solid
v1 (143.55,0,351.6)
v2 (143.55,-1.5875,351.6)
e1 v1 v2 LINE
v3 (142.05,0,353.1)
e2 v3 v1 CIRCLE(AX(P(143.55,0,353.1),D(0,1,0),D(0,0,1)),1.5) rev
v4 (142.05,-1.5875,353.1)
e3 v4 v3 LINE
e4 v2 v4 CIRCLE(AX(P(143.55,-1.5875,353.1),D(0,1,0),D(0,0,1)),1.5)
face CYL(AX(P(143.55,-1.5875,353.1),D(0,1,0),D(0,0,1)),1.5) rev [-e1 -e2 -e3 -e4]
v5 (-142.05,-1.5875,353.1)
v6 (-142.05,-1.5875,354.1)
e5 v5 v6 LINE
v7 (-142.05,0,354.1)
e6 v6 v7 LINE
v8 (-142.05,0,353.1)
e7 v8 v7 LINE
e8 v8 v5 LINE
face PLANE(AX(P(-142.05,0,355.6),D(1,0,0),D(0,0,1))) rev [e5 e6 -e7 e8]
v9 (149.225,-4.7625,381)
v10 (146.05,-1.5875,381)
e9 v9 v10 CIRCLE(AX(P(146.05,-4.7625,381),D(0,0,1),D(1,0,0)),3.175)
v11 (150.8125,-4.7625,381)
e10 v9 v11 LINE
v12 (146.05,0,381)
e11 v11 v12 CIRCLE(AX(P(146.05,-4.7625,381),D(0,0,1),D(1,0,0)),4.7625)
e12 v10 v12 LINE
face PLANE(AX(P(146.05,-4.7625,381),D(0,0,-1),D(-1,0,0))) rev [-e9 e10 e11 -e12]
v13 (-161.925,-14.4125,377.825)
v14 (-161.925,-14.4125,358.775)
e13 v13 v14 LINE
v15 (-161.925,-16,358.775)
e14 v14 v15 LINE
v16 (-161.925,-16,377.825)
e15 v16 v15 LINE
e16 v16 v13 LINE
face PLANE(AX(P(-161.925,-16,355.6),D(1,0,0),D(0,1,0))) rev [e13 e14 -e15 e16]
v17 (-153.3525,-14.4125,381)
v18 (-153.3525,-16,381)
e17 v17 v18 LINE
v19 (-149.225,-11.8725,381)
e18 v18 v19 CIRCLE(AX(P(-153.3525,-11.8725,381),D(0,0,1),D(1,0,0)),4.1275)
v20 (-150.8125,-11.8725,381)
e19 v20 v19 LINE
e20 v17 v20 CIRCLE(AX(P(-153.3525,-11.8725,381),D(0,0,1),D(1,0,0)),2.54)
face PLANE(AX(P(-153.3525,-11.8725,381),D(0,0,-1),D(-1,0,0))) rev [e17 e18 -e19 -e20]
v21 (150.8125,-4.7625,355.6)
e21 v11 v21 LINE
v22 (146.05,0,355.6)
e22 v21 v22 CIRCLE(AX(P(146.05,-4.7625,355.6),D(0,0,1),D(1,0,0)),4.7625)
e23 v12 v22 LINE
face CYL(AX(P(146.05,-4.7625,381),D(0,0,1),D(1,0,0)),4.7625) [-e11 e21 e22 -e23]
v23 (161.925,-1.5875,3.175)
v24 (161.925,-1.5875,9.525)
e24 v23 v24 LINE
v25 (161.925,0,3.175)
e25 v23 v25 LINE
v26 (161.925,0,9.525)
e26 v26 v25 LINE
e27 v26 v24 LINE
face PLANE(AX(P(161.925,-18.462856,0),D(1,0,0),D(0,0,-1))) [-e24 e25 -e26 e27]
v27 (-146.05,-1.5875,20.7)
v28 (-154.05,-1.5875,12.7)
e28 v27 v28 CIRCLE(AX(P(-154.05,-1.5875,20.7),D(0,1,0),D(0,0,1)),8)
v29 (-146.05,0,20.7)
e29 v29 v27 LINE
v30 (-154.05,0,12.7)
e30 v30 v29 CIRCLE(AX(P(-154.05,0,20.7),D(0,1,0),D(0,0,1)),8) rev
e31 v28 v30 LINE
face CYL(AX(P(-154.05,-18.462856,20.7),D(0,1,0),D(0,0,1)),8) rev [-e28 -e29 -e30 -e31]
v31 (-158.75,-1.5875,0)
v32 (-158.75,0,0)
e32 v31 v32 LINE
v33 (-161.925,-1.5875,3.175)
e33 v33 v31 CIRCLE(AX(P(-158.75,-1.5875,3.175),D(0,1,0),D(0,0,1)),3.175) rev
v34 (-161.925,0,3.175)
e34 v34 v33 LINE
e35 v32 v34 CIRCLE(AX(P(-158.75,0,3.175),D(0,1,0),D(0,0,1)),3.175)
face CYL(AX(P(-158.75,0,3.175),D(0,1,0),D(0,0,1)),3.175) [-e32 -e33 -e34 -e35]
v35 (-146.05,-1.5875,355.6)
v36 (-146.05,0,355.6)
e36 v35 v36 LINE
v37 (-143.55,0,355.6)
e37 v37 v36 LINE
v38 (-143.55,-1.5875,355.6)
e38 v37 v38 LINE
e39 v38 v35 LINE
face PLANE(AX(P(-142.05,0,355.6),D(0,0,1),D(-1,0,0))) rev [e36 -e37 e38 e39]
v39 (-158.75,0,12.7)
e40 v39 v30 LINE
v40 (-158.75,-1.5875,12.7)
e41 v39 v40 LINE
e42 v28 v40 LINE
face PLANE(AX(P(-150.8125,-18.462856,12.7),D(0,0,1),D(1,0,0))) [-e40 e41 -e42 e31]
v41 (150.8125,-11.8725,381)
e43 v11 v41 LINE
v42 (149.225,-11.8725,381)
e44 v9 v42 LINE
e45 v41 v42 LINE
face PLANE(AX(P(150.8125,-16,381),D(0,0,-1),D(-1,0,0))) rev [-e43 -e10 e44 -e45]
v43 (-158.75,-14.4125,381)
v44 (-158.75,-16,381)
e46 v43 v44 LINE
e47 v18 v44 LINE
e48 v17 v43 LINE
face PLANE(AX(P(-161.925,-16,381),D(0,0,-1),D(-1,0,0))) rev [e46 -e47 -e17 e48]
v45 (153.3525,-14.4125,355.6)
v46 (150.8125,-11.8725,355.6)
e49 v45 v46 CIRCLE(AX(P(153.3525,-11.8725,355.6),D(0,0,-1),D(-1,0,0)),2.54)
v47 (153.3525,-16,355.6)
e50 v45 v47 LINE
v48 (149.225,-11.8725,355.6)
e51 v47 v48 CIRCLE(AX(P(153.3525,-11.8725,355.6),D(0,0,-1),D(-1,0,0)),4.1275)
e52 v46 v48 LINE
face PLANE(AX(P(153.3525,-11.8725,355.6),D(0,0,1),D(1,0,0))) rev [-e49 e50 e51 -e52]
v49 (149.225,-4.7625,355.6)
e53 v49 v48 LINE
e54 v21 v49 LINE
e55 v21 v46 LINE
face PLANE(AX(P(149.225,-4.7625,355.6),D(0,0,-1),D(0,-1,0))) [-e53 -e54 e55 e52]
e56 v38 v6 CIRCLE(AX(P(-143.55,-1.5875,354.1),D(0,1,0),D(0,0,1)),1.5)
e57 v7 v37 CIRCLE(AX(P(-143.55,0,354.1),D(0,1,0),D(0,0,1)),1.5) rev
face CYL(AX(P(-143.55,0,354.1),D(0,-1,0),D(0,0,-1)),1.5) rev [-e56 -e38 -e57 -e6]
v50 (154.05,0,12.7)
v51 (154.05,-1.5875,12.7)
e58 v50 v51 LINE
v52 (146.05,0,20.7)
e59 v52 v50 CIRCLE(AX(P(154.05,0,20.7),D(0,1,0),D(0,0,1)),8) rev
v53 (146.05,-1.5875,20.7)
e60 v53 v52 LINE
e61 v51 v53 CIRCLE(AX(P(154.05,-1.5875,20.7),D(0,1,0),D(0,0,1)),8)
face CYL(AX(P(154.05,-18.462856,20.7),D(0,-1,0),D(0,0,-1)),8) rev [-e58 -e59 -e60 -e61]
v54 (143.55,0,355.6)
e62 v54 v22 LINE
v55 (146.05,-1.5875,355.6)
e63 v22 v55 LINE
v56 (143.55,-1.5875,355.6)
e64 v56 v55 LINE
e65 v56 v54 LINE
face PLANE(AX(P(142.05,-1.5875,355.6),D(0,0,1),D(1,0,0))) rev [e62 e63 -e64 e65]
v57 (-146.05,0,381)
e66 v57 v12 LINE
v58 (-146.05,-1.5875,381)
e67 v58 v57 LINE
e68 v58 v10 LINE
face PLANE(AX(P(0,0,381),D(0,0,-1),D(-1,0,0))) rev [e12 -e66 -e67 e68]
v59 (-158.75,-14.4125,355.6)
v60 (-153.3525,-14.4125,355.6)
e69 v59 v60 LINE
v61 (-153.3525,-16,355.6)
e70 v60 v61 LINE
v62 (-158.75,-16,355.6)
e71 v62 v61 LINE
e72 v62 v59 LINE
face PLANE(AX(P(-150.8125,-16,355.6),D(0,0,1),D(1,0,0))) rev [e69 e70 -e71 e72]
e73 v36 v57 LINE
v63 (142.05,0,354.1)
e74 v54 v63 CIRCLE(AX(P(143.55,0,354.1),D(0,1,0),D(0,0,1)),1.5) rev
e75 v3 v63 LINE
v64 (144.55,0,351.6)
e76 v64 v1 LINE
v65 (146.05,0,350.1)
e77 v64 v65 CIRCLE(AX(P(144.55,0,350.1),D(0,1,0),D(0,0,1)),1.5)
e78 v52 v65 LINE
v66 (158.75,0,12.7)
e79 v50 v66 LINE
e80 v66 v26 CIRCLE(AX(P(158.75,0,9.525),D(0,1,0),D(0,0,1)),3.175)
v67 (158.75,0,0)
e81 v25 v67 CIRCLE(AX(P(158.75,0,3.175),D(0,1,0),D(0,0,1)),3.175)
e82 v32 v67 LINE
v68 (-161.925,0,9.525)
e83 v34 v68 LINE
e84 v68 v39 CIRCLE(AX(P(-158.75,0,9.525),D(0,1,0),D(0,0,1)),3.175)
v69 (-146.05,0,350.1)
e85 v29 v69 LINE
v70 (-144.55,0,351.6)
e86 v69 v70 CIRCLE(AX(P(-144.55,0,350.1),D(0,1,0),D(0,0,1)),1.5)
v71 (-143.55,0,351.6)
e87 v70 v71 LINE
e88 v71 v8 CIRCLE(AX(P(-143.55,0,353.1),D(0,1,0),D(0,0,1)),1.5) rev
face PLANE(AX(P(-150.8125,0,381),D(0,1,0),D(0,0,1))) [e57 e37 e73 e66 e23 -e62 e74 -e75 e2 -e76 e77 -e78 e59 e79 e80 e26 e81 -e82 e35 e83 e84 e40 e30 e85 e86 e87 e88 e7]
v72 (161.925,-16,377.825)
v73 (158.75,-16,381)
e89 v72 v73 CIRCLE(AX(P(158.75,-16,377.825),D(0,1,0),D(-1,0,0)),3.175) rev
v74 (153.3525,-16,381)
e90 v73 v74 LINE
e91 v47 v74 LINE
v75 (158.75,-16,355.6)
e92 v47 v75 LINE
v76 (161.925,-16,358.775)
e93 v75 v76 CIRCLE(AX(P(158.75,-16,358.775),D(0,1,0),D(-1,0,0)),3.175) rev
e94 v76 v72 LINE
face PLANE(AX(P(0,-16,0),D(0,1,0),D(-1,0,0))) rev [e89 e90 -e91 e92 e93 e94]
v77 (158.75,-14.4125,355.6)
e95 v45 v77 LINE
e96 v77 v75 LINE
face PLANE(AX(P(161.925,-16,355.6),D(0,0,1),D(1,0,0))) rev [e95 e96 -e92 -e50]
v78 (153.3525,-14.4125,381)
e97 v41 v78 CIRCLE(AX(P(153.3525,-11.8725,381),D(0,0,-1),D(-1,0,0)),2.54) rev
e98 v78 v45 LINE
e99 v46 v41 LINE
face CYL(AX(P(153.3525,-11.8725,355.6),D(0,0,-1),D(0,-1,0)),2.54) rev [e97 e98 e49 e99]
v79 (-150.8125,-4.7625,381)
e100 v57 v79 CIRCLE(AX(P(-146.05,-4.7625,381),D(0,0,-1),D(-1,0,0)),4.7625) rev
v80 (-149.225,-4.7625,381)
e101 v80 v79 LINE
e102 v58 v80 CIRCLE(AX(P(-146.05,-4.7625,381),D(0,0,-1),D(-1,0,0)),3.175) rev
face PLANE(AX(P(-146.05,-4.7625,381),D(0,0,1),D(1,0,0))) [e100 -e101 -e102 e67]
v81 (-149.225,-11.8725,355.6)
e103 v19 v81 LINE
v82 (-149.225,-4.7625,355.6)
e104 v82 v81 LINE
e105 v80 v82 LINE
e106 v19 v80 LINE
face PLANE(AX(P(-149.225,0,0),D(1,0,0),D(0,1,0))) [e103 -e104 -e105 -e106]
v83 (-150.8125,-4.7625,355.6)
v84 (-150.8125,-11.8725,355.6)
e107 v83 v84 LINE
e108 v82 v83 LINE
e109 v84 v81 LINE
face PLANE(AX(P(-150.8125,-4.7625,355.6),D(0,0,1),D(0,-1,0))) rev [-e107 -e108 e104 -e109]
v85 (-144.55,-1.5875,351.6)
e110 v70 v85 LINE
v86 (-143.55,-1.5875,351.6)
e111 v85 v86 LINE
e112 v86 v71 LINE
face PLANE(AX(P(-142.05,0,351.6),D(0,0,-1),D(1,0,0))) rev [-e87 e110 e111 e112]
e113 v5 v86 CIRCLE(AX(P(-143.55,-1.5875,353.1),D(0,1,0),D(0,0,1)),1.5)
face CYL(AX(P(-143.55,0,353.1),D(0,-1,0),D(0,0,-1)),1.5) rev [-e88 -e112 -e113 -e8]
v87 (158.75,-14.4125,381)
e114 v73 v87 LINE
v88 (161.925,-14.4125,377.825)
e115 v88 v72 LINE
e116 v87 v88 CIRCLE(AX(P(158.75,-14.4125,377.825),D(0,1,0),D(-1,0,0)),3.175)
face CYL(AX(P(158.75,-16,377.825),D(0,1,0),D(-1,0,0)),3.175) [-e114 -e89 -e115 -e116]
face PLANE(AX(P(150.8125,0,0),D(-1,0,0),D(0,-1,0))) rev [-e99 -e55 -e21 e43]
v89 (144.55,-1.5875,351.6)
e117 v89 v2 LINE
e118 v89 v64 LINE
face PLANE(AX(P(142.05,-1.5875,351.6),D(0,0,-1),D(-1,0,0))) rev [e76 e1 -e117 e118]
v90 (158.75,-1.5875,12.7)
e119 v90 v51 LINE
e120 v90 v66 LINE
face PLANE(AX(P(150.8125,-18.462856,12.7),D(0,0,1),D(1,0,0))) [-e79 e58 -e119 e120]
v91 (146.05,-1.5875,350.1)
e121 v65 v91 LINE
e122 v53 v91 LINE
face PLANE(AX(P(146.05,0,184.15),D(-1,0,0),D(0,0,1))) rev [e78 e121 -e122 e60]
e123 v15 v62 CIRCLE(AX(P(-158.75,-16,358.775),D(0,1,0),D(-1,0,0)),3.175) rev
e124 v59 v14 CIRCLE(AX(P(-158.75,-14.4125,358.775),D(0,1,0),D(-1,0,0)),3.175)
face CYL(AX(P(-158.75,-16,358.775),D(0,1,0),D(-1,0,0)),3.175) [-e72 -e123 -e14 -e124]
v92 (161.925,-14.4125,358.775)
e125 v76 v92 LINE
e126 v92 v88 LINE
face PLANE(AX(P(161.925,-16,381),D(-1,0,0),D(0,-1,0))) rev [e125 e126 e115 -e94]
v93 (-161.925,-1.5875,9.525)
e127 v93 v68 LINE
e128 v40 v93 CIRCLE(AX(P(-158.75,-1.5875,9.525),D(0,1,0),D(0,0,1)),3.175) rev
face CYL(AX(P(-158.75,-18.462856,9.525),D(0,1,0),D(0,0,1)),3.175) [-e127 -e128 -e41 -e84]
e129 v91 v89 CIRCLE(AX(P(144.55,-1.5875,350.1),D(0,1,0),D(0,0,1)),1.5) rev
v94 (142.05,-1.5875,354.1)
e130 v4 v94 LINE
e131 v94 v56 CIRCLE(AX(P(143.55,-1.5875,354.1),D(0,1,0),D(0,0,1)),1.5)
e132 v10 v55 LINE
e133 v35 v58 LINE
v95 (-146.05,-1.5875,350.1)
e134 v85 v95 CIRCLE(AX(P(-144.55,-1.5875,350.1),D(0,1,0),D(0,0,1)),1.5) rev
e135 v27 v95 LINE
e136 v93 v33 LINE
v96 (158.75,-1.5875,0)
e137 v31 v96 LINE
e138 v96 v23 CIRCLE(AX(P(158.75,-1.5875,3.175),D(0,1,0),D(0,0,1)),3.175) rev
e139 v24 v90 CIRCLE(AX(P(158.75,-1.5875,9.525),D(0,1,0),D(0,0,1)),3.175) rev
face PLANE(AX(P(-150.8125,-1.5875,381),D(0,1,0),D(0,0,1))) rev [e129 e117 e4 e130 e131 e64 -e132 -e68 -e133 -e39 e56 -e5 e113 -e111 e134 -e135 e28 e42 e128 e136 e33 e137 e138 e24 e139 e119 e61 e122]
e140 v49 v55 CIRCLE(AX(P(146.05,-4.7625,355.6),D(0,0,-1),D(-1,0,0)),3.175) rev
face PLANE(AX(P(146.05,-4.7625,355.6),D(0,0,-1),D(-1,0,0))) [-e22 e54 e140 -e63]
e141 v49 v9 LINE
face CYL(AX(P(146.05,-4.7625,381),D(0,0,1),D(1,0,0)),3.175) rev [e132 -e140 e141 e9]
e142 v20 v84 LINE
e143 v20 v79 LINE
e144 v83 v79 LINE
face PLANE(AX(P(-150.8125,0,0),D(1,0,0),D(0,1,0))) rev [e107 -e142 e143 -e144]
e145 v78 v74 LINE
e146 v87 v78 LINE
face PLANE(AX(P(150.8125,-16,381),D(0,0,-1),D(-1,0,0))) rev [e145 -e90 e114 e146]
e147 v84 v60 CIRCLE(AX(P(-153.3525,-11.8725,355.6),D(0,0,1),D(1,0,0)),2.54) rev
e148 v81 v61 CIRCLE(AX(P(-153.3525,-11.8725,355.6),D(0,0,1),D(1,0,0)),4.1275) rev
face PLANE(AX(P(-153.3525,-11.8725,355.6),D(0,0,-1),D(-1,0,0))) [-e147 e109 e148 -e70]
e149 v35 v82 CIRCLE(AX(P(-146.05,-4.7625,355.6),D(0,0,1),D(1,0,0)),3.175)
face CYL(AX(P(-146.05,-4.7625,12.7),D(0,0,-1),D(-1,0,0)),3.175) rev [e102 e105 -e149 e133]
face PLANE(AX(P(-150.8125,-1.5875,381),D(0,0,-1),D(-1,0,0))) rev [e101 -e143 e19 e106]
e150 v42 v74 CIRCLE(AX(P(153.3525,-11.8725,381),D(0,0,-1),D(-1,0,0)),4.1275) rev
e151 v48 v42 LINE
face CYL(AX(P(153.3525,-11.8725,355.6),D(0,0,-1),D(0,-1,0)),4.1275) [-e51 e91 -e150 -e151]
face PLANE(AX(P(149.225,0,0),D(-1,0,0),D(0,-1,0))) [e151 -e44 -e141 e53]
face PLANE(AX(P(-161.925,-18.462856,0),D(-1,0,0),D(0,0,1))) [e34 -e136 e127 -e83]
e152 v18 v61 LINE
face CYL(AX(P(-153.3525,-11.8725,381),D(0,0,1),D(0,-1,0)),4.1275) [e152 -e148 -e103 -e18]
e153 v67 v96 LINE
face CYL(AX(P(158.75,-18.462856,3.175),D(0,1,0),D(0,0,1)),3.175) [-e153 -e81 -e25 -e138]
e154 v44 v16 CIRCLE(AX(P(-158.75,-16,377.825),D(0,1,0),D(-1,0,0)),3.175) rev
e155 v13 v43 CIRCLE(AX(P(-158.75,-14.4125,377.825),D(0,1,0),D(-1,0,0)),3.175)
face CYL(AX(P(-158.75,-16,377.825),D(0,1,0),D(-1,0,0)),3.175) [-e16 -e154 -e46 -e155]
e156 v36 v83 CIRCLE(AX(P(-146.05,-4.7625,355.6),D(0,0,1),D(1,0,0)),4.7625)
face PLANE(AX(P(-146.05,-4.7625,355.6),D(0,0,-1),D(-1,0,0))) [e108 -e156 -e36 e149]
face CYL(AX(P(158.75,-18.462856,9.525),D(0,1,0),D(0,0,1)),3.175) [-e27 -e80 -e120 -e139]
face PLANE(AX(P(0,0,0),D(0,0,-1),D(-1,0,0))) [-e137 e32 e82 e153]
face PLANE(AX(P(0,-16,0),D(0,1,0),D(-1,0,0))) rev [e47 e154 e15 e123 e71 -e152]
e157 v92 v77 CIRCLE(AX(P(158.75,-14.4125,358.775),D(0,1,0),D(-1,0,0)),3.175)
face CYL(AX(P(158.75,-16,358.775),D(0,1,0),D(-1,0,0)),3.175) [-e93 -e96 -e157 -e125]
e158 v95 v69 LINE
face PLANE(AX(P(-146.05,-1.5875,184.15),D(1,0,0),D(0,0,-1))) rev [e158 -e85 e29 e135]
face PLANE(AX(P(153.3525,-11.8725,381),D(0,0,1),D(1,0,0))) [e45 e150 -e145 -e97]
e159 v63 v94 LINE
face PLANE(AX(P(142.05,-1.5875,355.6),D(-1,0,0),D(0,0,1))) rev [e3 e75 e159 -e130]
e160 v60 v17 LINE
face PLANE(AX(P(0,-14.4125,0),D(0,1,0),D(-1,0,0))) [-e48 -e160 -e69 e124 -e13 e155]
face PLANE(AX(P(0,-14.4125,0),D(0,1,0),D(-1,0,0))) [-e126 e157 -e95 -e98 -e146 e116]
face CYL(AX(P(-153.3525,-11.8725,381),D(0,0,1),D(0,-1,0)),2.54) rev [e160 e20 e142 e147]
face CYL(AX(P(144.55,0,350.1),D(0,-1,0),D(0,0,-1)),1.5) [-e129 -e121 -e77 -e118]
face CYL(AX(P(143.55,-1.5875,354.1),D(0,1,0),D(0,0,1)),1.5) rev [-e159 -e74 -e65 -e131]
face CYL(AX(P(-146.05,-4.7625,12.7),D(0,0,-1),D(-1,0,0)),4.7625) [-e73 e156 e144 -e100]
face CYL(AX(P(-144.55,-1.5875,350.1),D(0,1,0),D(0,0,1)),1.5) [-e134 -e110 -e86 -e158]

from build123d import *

# Parameters (mm, degrees)
SKETCH5_W                      = 301.625
SKETCH5_H                      = 1.5875
BASE_FLANGE1_DEPTH             = 381
SKETCH10_W                     = 11.1125
SKETCH10_H                     = 12.7
BOSS_EXTRUDE1_DEPTH            = 1.5875
EDGE_FLANGE1_STRIP_W           = 12.7
EDGE_FLANGE1_STRIP_H           = 1.5875
EDGE_FLANGE1_STRIP_CUT_DEPTH   = 368.3
EDGE_FLANGE1_STRIP_2_W         = 12.7
EDGE_FLANGE1_STRIP_2_H         = 1.5875
EDGE_FLANGE1_STRIP_CUT_2_DEPTH = 368.3
EDGE_FLANGE1_DEPTH             = 368.3
EDGE_FLANGE1_BEND_DEPTH        = 368.3
CUT_EXTRUDE1_START             = -25.4
CUT_EXTRUDE1_DEPTH             = 342.9
EDGE_FLANGE2_STRIP_W           = 11.43
EDGE_FLANGE2_STRIP_H           = 1.5875
EDGE_FLANGE2_STRIP_CUT_DEPTH   = 25.4
EDGE_FLANGE2_DEPTH             = 25.4
EDGE_FLANGE3_STRIP_W           = 11.43
EDGE_FLANGE3_STRIP_H           = 1.5875
EDGE_FLANGE3_STRIP_CUT_DEPTH   = 25.4
EDGE_FLANGE3_DEPTH             = 25.4
FILLET1_R                      = 8
FILLET2_R                      = 3.175
SKETCH30_W                     = 4
SKETCH30_H                     = 1.5875
CUT_EXTRUDE9_DEPTH             = 4
SKETCH31_W                     = 4
SKETCH31_H                     = 1.5875
CUT_EXTRUDE10_DEPTH            = 4
FILLET4_R                      = 1.5


# Sheet-metal steps are written as plain solids
with BuildPart() as part:
    # Sketch5 → Base-Flange1 (new body)
    with BuildSketch(Plane.XY):
        with Locations((0, -0.79375)):
            Rectangle(SKETCH5_W, SKETCH5_H)
    extrude(amount=BASE_FLANGE1_DEPTH)

    # Sketch10 → Boss-Extrude1 (add)
    with BuildSketch(Plane(origin=(0, 0, 0), x_dir=(1, 0, 0), z_dir=(0, 1, 0))):
        with Locations((-156.36875, -6.35)):
            Rectangle(SKETCH10_W, SKETCH10_H)
        with Locations((156.36875, -6.35)):
            Rectangle(SKETCH10_W, SKETCH10_H)
    extrude(amount=-BOSS_EXTRUDE1_DEPTH)

    # Edge-Flange1 strip (across the edge) → Edge-Flange1 strip cut (cut)
    with BuildSketch(Plane(origin=(150.8125, -1.5875, 12.7), x_dir=(-1, 0, 0), z_dir=(0, 0, 1))):
        with Locations((-1.5875, -0.79375)):
            Rectangle(EDGE_FLANGE1_STRIP_W, EDGE_FLANGE1_STRIP_H)
    extrude(amount=EDGE_FLANGE1_STRIP_CUT_DEPTH, mode=Mode.SUBTRACT)

    # Edge-Flange1 strip 2 (across the edge) → Edge-Flange1 strip cut 2 (cut)
    with BuildSketch(Plane(origin=(-150.8125, -1.5875, 381), x_dir=(1, 0, 0), z_dir=(0, 0, -1))):
        with Locations((-1.5875, -0.79375)):
            Rectangle(EDGE_FLANGE1_STRIP_2_W, EDGE_FLANGE1_STRIP_2_H)
    extrude(amount=EDGE_FLANGE1_STRIP_CUT_2_DEPTH, mode=Mode.SUBTRACT)

    # Edge-Flange1 section (across the edge) → Edge-Flange1 (add)
    with BuildSketch(Plane(origin=(150.8125, -1.5875, 12.7), x_dir=(-1, 0, 0), z_dir=(0, 0, 1))):
        with BuildLine():
            Line((0, 3.175), (0, 14.4125))
            Line((0, 14.4125), (1.5875, 14.4125))
            Line((1.5875, 14.4125), (1.5875, 3.175))
            ThreePointArc((1.5875, 3.175), (2.51743597, 0.92993597), (4.7625, 0))
            Line((4.7625, 0), (4.7625, -1.5875))
            ThreePointArc((4.7625, -1.5875), (1.394903955, -0.192596045), (0, 3.175))
        make_face()
    extrude(amount=EDGE_FLANGE1_DEPTH)

    # Edge-Flange1 section 2 (across the edge) → Edge-Flange1 bend (add)
    with BuildSketch(Plane(origin=(-150.8125, -1.5875, 381), x_dir=(1, 0, 0), z_dir=(0, 0, -1))):
        with BuildLine():
            Line((0, 3.175), (0, 14.4125))
            Line((0, 14.4125), (1.5875, 14.4125))
            Line((1.5875, 14.4125), (1.5875, 3.175))
            ThreePointArc((1.5875, 3.175), (2.51743597, 0.92993597), (4.7625, 0))
            Line((4.7625, 0), (4.7625, -1.5875))
            ThreePointArc((4.7625, -1.5875), (1.394903955, -0.192596045), (0, 3.175))
        make_face()
    extrude(amount=EDGE_FLANGE1_BEND_DEPTH)

    # Sketch20 → Cut-Extrude1 (cut)
    with BuildSketch(Plane.XY.offset(381).offset(CUT_EXTRUDE1_START)):
        with BuildLine():
            Line((-150.8125, -4.7625), (-150.8125, -16))
            Line((-150.8125, -16), (-149.225, -16))
            Line((-149.225, -16), (-149.225, -4.7625))
            ThreePointArc((-149.225, -4.7625), (-148.29506403, -2.51743597), (-146.05, -1.5875))
            Line((-146.05, -1.5875), (-146.05, 0))
            ThreePointArc((-146.05, 0), (-149.417596045, -1.394903955), (-150.8125, -4.7625))
        make_face()
        with BuildLine():
            Line((149.225, -4.7625), (149.225, -16))
            Line((149.225, -16), (150.8125, -16))
            Line((150.8125, -16), (150.8125, -4.7625))
            ThreePointArc((150.8125, -4.7625), (149.417596045, -1.394903955), (146.05, 0))
            Line((146.05, 0), (146.05, -1.5875))
            ThreePointArc((146.05, -1.5875), (148.29506403, -2.51743597), (149.225, -4.7625))
        make_face()
    extrude(amount=-CUT_EXTRUDE1_DEPTH, mode=Mode.SUBTRACT)

    # Edge-Flange2 strip (across the edge) → Edge-Flange2 strip cut (cut)
    with BuildSketch(Plane(origin=(-150.8125, -16, 355.6), x_dir=(0, 1, 0), z_dir=(0, 0, 1))):
        with Locations((-1.5875, -0.79375)):
            Rectangle(EDGE_FLANGE2_STRIP_W, EDGE_FLANGE2_STRIP_H)
    extrude(amount=EDGE_FLANGE2_STRIP_CUT_DEPTH, mode=Mode.SUBTRACT)

    # Edge-Flange2 section (across the edge) → Edge-Flange2 (add)
    with BuildSketch(Plane(origin=(-150.8125, -16, 355.6), x_dir=(0, 1, 0), z_dir=(0, 0, 1))):
        with BuildLine():
            Line((0, 2.54), (0, 11.1125))
            Line((0, 11.1125), (1.5875, 11.1125))
            Line((1.5875, 11.1125), (1.5875, 2.54))
            ThreePointArc((1.5875, 2.54), (2.331448776, 0.743948776), (4.1275, 0))
            Line((4.1275, 0), (4.1275, -1.5875))
            ThreePointArc((4.1275, -1.5875), (1.208916761, -0.378583239), (0, 2.54))
        make_face()
    extrude(amount=EDGE_FLANGE2_DEPTH)

    # Edge-Flange3 strip (across the edge) → Edge-Flange3 strip cut (cut)
    with BuildSketch(Plane(origin=(150.8125, -16, 381), x_dir=(0, 1, 0), z_dir=(0, 0, -1))):
        with Locations((-1.5875, -0.79375)):
            Rectangle(EDGE_FLANGE3_STRIP_W, EDGE_FLANGE3_STRIP_H)
    extrude(amount=EDGE_FLANGE3_STRIP_CUT_DEPTH, mode=Mode.SUBTRACT)

    # Edge-Flange3 section (across the edge) → Edge-Flange3 (add)
    with BuildSketch(Plane(origin=(150.8125, -16, 381), x_dir=(0, 1, 0), z_dir=(0, 0, -1))):
        with BuildLine():
            Line((0, 2.54), (0, 11.1125))
            Line((0, 11.1125), (1.5875, 11.1125))
            Line((1.5875, 11.1125), (1.5875, 2.54))
            ThreePointArc((1.5875, 2.54), (2.331448776, 0.743948776), (4.1275, 0))
            Line((4.1275, 0), (4.1275, -1.5875))
            ThreePointArc((4.1275, -1.5875), (1.208916761, -0.378583239), (0, 2.54))
        make_face()
    extrude(amount=EDGE_FLANGE3_DEPTH)

    # Fillet1
    fillet1_edges = [part.edges().sort_by_distance(p)[0] for p in [
        (-146.05, -0.79375, 12.7),
        (146.05, -0.79375, 12.7),
    ]]
    fillet(fillet1_edges, radius=FILLET1_R)

    # Fillet2
    fillet2_edges = [part.edges().sort_by_distance(p)[0] for p in [
        (-161.925, -0.79375, 12.7),
        (-161.925, -0.79375, 0),
        (-161.925, -15.20625, 355.6),
        (-161.925, -15.20625, 381),
        (161.925, -15.20625, 381),
        (161.925, -15.20625, 355.6),
        (161.925, -0.79375, 0),
        (161.925, -0.79375, 12.7),
    ]]
    fillet(fillet2_edges, radius=FILLET2_R)

    # Sketch30 → Cut-Extrude9 (cut)
    with BuildSketch(Plane.ZY.offset(146.05)):
        with Locations((353.6, -0.79375)):
            Rectangle(SKETCH30_W, SKETCH30_H)
    extrude(amount=-CUT_EXTRUDE9_DEPTH, mode=Mode.SUBTRACT)

    # Sketch31 → Cut-Extrude10 (cut)
    with BuildSketch(Plane(origin=(146.05, 0, 0), x_dir=(0, 0, -1), z_dir=(1, 0, 0))):
        with Locations((-353.6, -0.79375)):
            Rectangle(SKETCH31_W, SKETCH31_H)
    extrude(amount=-CUT_EXTRUDE10_DEPTH, mode=Mode.SUBTRACT)

    # Fillet4
    fillet4_edges = [part.edges().sort_by_distance(p)[0] for p in [
        (-146.05, -0.79375, 351.6),
        (-142.05, -0.79375, 351.6),
        (-142.05, -0.79375, 355.6),
        (146.05, -0.79375, 351.6),
        (142.05, -0.79375, 351.6),
        (142.05, -0.79375, 355.6),
    ]]
    fillet(fillet4_edges, radius=FILLET4_R)


solid = part.part
